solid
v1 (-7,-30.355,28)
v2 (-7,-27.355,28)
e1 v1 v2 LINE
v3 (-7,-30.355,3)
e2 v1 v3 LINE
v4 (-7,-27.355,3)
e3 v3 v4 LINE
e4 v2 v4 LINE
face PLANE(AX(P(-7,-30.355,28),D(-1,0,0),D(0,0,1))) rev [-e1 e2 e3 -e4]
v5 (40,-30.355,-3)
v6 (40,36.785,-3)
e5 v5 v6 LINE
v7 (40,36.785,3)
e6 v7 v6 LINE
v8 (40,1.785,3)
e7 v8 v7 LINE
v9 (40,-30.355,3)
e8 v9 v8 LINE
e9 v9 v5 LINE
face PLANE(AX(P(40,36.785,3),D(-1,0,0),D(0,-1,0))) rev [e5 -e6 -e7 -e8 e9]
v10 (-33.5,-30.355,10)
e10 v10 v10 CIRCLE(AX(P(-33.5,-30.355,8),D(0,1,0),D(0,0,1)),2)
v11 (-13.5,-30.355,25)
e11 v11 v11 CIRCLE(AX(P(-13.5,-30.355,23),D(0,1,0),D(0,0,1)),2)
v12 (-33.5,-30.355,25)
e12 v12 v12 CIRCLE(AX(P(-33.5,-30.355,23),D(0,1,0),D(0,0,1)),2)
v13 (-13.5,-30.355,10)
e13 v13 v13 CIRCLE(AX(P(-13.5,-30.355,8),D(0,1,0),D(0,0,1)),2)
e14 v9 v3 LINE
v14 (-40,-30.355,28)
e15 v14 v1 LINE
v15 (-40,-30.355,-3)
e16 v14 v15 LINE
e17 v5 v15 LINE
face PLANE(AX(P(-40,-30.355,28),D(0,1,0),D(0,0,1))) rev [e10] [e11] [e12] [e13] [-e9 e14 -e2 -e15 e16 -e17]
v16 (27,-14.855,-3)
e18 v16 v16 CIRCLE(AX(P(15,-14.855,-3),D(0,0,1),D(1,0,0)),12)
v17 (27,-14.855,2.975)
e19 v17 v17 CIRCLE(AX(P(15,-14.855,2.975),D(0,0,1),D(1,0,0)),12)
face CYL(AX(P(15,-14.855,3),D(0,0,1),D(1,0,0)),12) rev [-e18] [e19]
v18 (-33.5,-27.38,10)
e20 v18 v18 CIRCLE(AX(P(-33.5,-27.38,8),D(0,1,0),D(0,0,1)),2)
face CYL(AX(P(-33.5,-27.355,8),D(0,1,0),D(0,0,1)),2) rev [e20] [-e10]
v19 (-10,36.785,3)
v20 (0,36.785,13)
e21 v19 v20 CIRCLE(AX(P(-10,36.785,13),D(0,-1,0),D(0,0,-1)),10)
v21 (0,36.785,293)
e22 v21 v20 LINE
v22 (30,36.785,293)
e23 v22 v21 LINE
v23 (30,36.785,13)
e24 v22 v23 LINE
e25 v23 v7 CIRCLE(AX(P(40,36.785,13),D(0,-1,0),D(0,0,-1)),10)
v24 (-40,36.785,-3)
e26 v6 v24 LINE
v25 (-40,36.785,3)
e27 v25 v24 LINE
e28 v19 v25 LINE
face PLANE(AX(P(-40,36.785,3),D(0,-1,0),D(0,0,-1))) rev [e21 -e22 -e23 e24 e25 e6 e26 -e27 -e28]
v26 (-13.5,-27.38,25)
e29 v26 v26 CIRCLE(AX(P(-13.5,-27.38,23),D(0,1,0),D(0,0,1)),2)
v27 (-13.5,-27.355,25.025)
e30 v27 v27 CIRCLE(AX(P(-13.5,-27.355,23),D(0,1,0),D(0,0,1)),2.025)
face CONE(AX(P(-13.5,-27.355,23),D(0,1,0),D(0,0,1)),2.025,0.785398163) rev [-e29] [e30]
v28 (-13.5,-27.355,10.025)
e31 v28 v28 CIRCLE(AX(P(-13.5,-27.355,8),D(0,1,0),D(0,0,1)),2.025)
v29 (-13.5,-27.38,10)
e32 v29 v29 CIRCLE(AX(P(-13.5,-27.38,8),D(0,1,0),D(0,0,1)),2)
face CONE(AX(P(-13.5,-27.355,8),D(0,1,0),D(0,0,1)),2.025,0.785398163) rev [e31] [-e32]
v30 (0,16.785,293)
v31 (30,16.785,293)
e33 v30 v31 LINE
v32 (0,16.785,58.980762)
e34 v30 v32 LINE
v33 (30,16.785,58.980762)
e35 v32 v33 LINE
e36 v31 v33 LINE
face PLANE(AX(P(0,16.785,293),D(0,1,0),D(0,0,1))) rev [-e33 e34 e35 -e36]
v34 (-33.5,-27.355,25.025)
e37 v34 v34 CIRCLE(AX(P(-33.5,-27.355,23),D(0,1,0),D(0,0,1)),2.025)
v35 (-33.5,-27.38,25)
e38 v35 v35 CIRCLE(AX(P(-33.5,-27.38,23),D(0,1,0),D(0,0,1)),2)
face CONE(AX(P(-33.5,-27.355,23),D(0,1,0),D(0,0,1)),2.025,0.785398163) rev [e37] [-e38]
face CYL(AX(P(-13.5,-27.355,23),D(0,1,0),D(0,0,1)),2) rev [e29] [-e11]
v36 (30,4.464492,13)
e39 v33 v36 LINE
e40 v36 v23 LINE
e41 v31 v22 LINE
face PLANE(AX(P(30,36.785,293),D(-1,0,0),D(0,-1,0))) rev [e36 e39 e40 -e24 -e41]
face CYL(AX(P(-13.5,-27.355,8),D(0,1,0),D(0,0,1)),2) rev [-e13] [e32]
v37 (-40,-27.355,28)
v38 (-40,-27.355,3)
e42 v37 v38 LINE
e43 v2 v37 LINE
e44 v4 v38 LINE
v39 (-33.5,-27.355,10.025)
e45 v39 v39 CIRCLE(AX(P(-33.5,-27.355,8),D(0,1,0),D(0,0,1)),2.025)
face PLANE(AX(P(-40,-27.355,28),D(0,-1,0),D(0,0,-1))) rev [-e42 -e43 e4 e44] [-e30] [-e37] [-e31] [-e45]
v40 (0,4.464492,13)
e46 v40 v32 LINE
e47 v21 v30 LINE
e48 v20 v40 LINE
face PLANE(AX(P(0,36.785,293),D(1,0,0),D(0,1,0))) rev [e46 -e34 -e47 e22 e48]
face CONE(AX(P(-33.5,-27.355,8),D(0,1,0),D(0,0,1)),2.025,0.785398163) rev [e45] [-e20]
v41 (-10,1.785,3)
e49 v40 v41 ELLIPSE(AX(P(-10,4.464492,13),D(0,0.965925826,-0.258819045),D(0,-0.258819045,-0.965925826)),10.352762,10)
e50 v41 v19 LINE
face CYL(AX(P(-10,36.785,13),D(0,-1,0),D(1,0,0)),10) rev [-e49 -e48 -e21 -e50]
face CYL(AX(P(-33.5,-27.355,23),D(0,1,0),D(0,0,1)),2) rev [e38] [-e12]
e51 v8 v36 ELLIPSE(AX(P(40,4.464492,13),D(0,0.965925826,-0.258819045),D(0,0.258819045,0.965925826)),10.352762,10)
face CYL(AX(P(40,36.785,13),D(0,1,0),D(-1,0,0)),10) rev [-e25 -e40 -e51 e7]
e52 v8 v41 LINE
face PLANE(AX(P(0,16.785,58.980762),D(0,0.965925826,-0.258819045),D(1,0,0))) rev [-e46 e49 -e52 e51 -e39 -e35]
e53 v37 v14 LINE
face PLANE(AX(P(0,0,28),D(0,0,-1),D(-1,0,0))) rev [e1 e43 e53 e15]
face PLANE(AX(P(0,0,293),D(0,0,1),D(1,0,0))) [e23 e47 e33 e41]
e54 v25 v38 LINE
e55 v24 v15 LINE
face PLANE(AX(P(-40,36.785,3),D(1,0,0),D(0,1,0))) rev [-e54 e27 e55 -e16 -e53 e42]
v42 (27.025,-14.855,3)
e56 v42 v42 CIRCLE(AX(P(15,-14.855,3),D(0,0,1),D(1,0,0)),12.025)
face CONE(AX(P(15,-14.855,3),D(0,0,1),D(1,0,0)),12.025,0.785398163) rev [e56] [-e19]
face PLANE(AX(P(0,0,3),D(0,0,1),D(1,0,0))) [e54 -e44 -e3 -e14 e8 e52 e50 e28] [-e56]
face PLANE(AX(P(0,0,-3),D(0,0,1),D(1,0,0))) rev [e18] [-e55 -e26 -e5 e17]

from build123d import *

# Parameters (mm, degrees)
SKETCH1_W                            = 80
SKETCH1_H                            = 73.57
BOSS_EXTRUDE1_DEPTH                  = 3
SKETCH2_W                            = 33
SKETCH2_H                            = 3
BOSS_EXTRUDE2_DEPTH                  = 25
F_4_0_4_DIAMETER_HOLE1_D             = 4
F_4_0_4_DIAMETER_HOLE1_DEPTH         = 8
F_4_0_4_DIAMETER_HOLE1_CSINK_D       = 4.05
F_4_0_4_DIAMETER_HOLE1_CSINK_ANGLE   = 90
F_4_0_4_DIAMETER_HOLE1_TIP           = 1.201721238
F_24_0_24_DIAMETER_HOLE1_D           = 24
F_24_0_24_DIAMETER_HOLE1_DEPTH       = 8
F_24_0_24_DIAMETER_HOLE1_CSINK_D     = 24.05
F_24_0_24_DIAMETER_HOLE1_CSINK_ANGLE = 90
F_24_0_24_DIAMETER_HOLE1_TIP         = 7.210327428
SKETCH11_W                           = 6
SKETCH11_H                           = 6.43
CUT_EXTRUDE2_DEPTH                   = 93.396624533
SKETCH12_W                           = 30
SKETCH12_H                           = 20
BOSS_EXTRUDE5_DEPTH                  = 290
CHAMFER3_SIZE                        = 15
CHAMFER3_SIZE2                       = 55.980762114
FILLET1_R                            = 10


with BuildPart() as part:
    # Sketch1 → Boss-Extrude1 (new, symmetric)
    with BuildSketch(Plane.XY):
        Rectangle(SKETCH1_W, SKETCH1_H)
    extrude(amount=BOSS_EXTRUDE1_DEPTH, both=True)

    # Sketch2 → Boss-Extrude2 (add)
    with BuildSketch(Plane.XY.offset(3)):
        with Locations((-23.5, -28.855)):
            Rectangle(SKETCH2_W, SKETCH2_H)
    extrude(amount=BOSS_EXTRUDE2_DEPTH)

    # Ø4.0 (4) Diameter Hole1
    with Locations(Plane(origin=(0, -27.355, 0), x_dir=(1, 0, 0), z_dir=(0, 1, 0))):
        with Locations((-33.5, -8), (-13.5, -8), (-13.5, -23), (-33.5, -23)):
            CounterSinkHole(F_4_0_4_DIAMETER_HOLE1_D / 2, F_4_0_4_DIAMETER_HOLE1_CSINK_D / 2, depth=F_4_0_4_DIAMETER_HOLE1_DEPTH, counter_sink_angle=F_4_0_4_DIAMETER_HOLE1_CSINK_ANGLE)
            with Locations((0, 0, -(F_4_0_4_DIAMETER_HOLE1_DEPTH + F_4_0_4_DIAMETER_HOLE1_TIP / 2))):  # 118° drill point
                Cone(0, F_4_0_4_DIAMETER_HOLE1_D / 2, F_4_0_4_DIAMETER_HOLE1_TIP, mode=Mode.SUBTRACT)

    # Ø24.0 (24) Diameter Hole1
    with Locations(Plane.XY.offset(3)):
        with Locations((15, -14.855)):
            CounterSinkHole(F_24_0_24_DIAMETER_HOLE1_D / 2, F_24_0_24_DIAMETER_HOLE1_CSINK_D / 2, depth=F_24_0_24_DIAMETER_HOLE1_DEPTH, counter_sink_angle=F_24_0_24_DIAMETER_HOLE1_CSINK_ANGLE)
            with Locations((0, 0, -(F_24_0_24_DIAMETER_HOLE1_DEPTH + F_24_0_24_DIAMETER_HOLE1_TIP / 2))):  # 118° drill point
                Cone(0, F_24_0_24_DIAMETER_HOLE1_D / 2, F_24_0_24_DIAMETER_HOLE1_TIP, mode=Mode.SUBTRACT)

    # Sketch11 → Cut-Extrude2 (cut, through all)
    with BuildSketch(Plane.ZY.offset(40)):
        with Locations((0, -33.57)):
            Rectangle(SKETCH11_W, SKETCH11_H)
    extrude(amount=-CUT_EXTRUDE2_DEPTH, mode=Mode.SUBTRACT)

    # Sketch12 → Boss-Extrude5 (add)
    with BuildSketch(Plane.XY.offset(3)):
        with Locations((15, 26.785)):
            Rectangle(SKETCH12_W, SKETCH12_H)
    extrude(amount=BOSS_EXTRUDE5_DEPTH)

    # Chamfer3
    chamfer3_edges = [part.edges().sort_by_distance(p)[0] for p in [
        (15, 16.785, 3),
    ]]
    chamfer3_side = [part.faces().sort_by_distance(p)[0] for p in [
        (-3.197697434, 2.561053146, 3),
    ]]
    chamfer(chamfer3_edges, length=CHAMFER3_SIZE, length2=CHAMFER3_SIZE2, reference=chamfer3_side[0])

    # Fillet1
    fillet1_edges = [part.edges().sort_by_distance(p)[0] for p in [
        (0, 19.285, 3),
        (30, 19.285, 3),
    ]]
    fillet(fillet1_edges, radius=FILLET1_R - 0.0001)  # a hair under: the kernel refuses the full size


solid = part.part
